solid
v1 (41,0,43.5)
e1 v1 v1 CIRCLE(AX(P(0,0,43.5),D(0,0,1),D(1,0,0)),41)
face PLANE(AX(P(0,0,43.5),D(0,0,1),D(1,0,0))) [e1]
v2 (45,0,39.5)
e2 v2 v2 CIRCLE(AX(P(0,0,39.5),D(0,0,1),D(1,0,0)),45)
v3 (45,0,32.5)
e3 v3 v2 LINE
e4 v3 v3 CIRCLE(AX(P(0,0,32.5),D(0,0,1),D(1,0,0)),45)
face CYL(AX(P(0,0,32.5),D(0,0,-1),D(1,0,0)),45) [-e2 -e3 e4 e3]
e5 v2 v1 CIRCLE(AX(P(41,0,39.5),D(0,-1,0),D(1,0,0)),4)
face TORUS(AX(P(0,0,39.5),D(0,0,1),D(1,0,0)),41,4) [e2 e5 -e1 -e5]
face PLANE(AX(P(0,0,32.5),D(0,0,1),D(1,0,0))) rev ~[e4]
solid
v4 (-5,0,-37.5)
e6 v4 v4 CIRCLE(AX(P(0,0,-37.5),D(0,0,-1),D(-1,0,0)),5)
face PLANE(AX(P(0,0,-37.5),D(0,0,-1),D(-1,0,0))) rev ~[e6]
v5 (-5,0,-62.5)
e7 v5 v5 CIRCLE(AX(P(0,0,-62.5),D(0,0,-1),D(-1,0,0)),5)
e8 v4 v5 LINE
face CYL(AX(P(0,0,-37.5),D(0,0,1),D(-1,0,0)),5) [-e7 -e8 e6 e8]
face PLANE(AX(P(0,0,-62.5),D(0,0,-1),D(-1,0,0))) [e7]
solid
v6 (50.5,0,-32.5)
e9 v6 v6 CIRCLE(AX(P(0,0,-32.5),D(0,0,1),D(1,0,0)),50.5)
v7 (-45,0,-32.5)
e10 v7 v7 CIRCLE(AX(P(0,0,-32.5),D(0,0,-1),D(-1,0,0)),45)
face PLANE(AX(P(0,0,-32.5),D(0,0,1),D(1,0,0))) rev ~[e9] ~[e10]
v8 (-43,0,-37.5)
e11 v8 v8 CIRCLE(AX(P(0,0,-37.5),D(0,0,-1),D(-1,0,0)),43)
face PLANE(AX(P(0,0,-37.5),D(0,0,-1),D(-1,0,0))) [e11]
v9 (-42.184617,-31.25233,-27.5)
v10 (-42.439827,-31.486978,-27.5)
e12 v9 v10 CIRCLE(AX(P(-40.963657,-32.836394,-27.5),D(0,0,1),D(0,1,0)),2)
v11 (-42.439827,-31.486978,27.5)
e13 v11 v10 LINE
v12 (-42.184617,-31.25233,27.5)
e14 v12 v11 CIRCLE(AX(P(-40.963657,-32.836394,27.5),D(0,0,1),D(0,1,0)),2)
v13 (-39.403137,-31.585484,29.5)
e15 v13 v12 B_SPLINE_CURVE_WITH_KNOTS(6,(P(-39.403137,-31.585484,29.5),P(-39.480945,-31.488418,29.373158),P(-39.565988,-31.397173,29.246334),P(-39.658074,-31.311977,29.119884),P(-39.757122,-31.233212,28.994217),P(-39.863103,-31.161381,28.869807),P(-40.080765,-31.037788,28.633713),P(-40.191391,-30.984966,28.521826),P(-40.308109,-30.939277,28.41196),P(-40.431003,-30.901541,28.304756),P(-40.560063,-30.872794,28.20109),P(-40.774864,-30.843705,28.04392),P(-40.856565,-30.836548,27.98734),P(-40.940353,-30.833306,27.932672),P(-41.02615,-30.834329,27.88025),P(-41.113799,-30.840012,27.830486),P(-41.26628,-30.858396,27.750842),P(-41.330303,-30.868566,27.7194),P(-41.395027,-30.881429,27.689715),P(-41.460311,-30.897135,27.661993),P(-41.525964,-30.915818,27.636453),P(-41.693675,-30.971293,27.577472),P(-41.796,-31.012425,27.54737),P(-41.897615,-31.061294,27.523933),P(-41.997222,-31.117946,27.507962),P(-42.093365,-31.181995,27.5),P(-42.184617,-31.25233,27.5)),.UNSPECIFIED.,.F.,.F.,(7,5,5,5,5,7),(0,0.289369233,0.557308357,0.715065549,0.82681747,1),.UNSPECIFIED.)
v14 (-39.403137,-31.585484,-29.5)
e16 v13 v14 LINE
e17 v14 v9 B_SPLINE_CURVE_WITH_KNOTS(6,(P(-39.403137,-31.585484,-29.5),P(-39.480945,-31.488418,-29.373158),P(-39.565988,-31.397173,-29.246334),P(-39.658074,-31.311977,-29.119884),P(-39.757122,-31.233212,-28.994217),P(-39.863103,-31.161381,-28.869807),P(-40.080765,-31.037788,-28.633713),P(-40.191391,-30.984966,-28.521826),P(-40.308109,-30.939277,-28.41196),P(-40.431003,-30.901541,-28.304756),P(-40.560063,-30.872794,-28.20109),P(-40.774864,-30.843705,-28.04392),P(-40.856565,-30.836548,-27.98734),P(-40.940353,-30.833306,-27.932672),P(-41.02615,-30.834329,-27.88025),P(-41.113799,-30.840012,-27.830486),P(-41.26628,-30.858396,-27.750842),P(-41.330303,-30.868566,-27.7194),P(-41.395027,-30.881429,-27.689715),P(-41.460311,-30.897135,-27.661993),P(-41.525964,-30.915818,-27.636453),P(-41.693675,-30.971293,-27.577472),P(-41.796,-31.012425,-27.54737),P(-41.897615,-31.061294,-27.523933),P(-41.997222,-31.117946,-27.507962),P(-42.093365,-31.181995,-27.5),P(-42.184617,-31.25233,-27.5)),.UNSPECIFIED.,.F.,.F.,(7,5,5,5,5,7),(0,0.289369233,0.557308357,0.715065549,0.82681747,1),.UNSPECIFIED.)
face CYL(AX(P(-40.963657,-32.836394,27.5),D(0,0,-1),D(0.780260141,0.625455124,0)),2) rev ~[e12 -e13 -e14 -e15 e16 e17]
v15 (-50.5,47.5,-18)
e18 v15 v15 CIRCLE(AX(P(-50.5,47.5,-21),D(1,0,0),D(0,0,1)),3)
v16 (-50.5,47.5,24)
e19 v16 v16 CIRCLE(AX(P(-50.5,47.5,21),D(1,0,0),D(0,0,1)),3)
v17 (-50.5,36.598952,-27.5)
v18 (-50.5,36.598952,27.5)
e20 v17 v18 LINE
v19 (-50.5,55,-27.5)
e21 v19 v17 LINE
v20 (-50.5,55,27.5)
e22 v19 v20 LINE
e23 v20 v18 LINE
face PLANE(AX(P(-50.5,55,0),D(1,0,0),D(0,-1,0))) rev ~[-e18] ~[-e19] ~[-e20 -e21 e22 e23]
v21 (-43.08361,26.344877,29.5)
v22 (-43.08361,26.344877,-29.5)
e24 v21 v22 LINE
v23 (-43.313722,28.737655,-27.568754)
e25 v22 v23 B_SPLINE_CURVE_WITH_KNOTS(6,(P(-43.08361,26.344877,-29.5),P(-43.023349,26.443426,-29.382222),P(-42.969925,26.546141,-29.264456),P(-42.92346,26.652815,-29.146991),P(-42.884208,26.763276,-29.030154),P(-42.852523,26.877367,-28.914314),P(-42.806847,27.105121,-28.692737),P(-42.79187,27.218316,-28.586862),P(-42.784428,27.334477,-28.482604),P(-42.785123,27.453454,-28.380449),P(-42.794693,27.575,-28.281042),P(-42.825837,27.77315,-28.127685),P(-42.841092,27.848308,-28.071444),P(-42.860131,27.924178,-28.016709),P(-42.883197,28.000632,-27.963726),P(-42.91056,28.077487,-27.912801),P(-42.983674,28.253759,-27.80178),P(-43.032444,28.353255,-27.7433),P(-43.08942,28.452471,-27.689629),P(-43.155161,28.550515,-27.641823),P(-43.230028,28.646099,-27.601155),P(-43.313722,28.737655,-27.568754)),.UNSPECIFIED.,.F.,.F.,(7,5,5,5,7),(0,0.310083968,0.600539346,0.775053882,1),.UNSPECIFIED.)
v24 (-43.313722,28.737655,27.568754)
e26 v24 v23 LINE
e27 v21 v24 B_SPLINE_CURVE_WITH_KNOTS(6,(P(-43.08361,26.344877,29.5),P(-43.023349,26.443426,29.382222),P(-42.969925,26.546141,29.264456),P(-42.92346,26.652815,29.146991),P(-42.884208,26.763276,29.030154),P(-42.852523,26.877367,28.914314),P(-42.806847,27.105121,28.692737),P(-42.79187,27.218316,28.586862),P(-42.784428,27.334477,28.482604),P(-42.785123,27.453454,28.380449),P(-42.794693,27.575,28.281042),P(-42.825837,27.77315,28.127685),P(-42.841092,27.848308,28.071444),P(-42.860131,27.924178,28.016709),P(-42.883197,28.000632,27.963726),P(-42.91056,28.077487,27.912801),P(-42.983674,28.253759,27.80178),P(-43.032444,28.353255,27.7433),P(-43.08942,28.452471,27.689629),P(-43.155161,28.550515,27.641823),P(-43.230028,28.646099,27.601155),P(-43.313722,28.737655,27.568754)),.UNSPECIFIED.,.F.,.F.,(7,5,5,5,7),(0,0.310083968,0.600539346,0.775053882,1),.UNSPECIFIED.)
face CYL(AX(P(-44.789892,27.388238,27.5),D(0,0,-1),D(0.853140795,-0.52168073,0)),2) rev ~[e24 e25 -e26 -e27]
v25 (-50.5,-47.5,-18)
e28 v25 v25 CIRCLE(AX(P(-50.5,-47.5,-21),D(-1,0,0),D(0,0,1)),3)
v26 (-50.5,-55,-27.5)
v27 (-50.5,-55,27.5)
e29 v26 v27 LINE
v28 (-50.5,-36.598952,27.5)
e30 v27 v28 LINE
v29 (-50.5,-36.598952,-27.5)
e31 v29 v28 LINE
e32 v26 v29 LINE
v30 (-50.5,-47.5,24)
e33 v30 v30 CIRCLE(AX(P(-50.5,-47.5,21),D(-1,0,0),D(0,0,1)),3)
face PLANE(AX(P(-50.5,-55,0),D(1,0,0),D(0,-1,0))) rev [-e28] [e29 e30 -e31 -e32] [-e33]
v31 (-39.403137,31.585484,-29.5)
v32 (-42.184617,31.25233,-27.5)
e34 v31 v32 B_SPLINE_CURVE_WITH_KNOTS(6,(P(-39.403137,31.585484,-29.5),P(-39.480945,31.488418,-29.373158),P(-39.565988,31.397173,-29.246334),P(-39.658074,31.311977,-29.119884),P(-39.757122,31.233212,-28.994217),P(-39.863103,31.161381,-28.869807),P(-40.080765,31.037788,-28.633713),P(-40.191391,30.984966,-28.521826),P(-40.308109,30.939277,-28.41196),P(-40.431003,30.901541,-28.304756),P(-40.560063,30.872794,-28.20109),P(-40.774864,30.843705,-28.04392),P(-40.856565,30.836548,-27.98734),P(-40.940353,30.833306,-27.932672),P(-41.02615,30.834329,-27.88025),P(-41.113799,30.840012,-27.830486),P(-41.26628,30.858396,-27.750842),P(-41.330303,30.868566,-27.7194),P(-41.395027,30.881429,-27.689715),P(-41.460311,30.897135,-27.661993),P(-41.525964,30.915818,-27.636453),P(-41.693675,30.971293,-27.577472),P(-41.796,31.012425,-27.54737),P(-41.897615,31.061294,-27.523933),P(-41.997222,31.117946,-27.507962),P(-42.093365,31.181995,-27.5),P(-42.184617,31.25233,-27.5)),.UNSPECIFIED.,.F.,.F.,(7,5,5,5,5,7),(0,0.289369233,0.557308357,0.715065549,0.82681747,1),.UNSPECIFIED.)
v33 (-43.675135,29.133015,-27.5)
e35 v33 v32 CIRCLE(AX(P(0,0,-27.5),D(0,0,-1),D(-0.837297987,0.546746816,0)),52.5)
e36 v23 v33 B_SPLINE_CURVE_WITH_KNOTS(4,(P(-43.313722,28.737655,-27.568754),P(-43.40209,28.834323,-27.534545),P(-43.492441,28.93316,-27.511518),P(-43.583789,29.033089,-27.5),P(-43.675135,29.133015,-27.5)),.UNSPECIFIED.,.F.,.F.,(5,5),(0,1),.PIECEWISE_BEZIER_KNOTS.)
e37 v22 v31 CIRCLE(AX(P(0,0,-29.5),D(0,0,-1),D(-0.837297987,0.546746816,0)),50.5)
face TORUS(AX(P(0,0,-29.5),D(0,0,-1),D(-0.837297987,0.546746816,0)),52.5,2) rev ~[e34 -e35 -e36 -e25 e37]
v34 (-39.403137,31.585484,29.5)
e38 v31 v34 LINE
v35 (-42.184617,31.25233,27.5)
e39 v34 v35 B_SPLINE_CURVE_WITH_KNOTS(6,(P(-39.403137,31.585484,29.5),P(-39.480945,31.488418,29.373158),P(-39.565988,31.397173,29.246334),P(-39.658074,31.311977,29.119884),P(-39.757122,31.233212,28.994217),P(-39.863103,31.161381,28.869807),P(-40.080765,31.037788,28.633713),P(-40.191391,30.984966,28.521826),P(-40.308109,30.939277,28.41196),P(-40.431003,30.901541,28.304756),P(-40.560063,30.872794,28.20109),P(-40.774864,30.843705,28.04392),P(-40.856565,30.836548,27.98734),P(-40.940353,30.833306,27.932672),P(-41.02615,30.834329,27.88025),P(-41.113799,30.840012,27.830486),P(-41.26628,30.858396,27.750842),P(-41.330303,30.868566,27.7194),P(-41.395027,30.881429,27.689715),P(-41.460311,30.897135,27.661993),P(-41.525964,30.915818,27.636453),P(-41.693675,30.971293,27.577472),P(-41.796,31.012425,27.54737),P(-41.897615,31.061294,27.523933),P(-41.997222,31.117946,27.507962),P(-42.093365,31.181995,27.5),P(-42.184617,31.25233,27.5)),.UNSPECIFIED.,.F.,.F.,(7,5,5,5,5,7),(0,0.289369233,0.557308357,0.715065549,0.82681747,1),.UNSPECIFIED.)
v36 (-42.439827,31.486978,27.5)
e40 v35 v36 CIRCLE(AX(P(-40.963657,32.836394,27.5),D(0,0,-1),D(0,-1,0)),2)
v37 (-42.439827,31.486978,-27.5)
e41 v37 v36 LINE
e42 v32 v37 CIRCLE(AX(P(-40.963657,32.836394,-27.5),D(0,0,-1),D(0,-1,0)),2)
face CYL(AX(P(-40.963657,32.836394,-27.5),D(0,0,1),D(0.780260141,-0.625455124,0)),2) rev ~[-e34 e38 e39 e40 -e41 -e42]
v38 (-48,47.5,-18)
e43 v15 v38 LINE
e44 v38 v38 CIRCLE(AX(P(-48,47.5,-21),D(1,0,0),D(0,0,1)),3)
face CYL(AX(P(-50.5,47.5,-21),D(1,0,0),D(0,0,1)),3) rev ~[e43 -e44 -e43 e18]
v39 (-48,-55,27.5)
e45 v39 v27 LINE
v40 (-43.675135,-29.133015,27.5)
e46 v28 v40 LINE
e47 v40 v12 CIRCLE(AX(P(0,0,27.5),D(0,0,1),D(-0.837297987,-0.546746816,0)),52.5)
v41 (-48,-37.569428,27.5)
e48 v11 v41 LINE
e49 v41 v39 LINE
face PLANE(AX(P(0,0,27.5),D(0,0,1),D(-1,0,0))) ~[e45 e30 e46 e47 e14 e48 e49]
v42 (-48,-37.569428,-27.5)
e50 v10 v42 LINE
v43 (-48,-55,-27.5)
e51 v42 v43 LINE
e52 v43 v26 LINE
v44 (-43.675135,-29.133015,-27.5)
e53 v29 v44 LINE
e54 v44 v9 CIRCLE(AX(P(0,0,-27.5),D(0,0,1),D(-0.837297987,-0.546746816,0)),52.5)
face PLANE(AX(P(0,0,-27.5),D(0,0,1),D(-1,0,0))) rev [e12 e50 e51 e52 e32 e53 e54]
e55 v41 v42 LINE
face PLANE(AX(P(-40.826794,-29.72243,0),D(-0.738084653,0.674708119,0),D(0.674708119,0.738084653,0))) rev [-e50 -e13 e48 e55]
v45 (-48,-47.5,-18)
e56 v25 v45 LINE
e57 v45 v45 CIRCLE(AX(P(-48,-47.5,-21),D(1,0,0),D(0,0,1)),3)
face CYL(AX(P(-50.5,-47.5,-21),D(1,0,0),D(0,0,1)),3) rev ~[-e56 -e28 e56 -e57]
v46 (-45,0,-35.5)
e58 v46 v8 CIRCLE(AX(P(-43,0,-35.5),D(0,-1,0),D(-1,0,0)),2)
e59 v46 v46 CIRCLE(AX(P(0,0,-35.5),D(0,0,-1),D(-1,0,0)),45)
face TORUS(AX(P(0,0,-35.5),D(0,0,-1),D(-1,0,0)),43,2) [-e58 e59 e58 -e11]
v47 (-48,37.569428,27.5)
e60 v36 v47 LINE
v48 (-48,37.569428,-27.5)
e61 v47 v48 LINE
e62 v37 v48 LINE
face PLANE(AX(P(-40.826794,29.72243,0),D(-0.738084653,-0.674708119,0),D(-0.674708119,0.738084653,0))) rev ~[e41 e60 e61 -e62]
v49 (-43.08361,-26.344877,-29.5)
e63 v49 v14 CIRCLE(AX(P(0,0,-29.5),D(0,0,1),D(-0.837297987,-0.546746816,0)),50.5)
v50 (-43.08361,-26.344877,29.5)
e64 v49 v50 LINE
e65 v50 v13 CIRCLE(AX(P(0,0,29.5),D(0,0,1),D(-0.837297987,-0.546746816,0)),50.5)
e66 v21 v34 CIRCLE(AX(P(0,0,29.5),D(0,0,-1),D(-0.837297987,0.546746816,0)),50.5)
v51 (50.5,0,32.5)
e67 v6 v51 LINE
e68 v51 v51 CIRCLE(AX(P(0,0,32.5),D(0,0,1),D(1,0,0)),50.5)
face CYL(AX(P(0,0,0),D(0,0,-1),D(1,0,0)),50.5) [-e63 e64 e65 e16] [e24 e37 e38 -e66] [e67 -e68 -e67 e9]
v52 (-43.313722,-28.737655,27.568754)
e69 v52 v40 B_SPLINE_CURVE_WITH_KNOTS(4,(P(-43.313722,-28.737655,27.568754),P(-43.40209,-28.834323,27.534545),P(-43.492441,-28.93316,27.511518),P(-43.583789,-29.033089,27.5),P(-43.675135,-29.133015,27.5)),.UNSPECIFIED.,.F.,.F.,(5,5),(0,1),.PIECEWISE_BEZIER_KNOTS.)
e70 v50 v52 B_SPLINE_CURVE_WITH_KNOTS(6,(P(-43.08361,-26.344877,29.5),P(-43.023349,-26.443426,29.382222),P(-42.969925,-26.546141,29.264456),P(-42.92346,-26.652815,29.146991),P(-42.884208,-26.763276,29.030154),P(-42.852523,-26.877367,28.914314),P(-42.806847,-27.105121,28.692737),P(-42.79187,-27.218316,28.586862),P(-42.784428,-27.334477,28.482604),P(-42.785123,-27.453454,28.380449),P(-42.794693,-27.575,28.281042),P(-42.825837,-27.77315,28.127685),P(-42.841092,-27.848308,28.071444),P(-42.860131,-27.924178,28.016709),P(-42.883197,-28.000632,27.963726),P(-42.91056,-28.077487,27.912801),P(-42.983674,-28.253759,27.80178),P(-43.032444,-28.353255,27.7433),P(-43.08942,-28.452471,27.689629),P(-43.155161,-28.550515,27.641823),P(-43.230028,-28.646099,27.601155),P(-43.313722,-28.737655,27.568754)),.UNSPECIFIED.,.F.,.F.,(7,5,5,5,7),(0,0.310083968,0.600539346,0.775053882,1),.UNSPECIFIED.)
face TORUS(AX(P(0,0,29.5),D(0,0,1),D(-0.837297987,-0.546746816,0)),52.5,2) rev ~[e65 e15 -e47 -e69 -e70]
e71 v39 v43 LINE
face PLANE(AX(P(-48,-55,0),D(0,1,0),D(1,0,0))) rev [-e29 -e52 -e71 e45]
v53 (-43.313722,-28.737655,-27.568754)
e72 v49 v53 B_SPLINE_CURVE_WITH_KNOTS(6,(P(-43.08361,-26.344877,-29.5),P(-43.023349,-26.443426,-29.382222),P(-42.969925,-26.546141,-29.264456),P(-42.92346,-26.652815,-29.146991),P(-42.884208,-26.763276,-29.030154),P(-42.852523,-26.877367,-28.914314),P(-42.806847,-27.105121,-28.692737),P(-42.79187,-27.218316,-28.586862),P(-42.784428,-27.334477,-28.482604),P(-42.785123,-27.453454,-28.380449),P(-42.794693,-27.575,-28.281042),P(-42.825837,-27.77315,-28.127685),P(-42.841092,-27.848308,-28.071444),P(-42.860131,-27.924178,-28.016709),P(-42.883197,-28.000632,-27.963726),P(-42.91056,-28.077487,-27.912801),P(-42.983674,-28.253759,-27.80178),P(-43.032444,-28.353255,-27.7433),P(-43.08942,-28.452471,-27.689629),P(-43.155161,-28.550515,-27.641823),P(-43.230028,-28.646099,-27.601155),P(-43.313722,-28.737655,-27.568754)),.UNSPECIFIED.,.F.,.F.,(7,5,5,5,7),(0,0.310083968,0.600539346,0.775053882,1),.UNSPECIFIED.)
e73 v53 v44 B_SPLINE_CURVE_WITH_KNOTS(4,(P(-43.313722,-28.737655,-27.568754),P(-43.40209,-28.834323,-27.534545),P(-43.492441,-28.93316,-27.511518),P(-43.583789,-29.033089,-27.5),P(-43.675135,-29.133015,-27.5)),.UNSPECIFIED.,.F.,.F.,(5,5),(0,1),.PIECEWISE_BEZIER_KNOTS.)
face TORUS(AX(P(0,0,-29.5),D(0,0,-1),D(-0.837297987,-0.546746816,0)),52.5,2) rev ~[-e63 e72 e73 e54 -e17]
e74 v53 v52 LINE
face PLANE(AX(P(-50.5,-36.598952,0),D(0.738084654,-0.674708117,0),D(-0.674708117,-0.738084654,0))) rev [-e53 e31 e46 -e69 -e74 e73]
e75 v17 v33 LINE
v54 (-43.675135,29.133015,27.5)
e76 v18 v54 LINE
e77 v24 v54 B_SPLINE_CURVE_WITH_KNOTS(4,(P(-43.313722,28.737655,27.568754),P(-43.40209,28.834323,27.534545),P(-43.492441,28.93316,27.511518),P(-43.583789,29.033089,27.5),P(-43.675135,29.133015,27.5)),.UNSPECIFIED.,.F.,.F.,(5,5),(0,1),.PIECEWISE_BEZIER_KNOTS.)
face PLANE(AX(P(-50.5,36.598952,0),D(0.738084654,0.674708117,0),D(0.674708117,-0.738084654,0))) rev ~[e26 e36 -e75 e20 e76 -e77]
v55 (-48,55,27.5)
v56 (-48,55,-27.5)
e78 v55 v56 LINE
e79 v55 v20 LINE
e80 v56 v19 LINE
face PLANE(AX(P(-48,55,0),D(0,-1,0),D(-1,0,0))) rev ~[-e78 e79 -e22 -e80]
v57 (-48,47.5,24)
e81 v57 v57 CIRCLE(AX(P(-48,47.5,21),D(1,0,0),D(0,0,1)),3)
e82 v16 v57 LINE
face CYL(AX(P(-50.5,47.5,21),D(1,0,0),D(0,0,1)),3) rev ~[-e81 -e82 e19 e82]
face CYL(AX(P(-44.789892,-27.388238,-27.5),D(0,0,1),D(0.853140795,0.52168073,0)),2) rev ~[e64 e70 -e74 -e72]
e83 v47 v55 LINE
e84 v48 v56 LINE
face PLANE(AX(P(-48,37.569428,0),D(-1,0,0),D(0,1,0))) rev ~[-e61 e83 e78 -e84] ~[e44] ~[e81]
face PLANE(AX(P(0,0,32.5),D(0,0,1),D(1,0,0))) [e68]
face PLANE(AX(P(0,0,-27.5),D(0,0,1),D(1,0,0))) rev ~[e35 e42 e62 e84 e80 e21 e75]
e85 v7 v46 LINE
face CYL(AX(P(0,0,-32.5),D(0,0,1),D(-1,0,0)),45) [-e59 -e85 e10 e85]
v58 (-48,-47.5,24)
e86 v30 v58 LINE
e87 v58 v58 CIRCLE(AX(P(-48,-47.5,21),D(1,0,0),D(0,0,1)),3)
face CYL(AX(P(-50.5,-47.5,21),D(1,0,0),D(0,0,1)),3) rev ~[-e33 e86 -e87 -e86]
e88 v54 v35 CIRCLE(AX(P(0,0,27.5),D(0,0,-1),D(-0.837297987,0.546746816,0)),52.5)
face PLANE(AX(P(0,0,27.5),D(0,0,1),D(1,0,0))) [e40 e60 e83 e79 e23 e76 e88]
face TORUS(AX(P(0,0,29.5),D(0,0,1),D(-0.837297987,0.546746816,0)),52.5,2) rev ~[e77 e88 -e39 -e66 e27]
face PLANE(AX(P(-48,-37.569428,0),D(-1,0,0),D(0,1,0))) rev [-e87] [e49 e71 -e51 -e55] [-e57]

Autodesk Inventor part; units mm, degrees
ref_plane "YZ Plane" through (0, 0, 0) normal (1, 0, 0) x (0, 1, 0)
ref_plane "XZ Plane" through (0, 0, 0) normal (0, 1, 0) x (-1, 0, 0)
ref_plane "XY Plane" through (0, 0, 0) normal (0, 0, 1) x (1, 0, 0)
sketch "Sketch1" plane through (0, 0, 0) normal (0, 0, 1) x (1, 0, 0)
  circle A0 centre (0, 0) radius 50.5
  dimension "d0" = 101
sketch "Sketch1 outline for Extrusion1" plane through (0, 0, 0) normal (0, 0, 1) x (1, 0, 0)
  circle A0 centre (0, 0) radius 50.5
extrude "Extrusion1" add sketch "Sketch1 outline for Extrusion1" along normal mid plane 65
sketch "Sketch2" plane through (0, 0, 32.5) normal (0, 0, 1) x (1, 0, 0)
  circle A0 centre (0, 0) radius 45
  dimension "d3" = 90
sketch "Sketch2 outline for Extrusion2" plane through (0, 0, 32.5) normal (0, 0, 1) x (1, 0, 0)
  circle A0 centre (0, 0) radius 45
extrude "Extrusion2" add sketch "Sketch2 outline for Extrusion2" along normal blind 11 separate body
sketch "Sketch3" plane through (0, 0, -32.5) normal (0, 0, -1) x (-1, 0, 0)
  circle A0 centre (0, 0) radius 45
  dimension "d6" = 90
sketch "Sketch3 outline for Extrusion3" plane through (0, 0, -32.5) normal (0, 0, -1) x (-1, 0, 0)
  circle A0 centre (0, 0) radius 45
extrude "Extrusion3" add sketch "Sketch3 outline for Extrusion3" along normal blind 5 bodies 1
sketch "Sketch4" plane through (0, 0, 0) normal (0, 0, 1) x (1, 0, 0)
  line L0 (-50.5, 36.598952) -> (-50.5, 55)
  line L1 (-50.5, 55) -> (-48, 55)
  line L2 (-48, 55) -> (-48, 37.569428)
  line L3 (-48, 37.569428) -> (-40.826794, 29.72243)
  circle A0 centre (0, 0) radius 50.5
  line L4 (-50.5, 36.598952) -> (-42.283548, 27.610714)
  dimension "d9" = 55
  dimension "d10" = 2.5
  dimension "d11" = 2.5
  dimension "d12" = 18.40105
  dimension "d13" = 17.43057
sketch "Sketch4 outline for Extrusion4" plane through (0, 0, 0) normal (0, 0, 1) x (1, 0, 0)
  line L0 (-50.5, 55) -> (-50.5, 36.598952)
  line L1 (-48, 55) -> (-50.5, 55)
  line L2 (-48, 37.569428) -> (-48, 55)
  line L3 (-40.826794, 29.72243) -> (-48, 37.569428)
  arc A0 (-42.283548, 27.610714) -> (-40.826794, 29.72243) centre (0, 0) cw
  line L4 (-50.5, 36.598952) -> (-42.283548, 27.610714)
extrude "Extrusion4" add sketch "Sketch4 outline for Extrusion4" along normal mid plane 55 bodies 1
mirror "Mirror1" about plane through (0, 0, 0) normal (0, 1, 0) of "Extrusion4" bodies 1
sketch "Sketch5" plane through (-50.5, 36.598952, 27.5) normal (-1, 0, 0) x (0, 0, 1)
  line L0 (-27.5, 52.121928) -> (-27.5, -131.017503) construction
  point P0 (-27.5, -36.598952)
  point P1 (-6.5, 10.901048)
  point P2 (-48.5, 10.901048)
  dimension "d16" = 42
  dimension "d17" = 47.5
hole "Hole1" at (-50.5, 47.5, 21) at (-50.5, 47.5, -21) direction (1, 0, 0) diameter 6 depth 4.825 bodies 1
mirror "Mirror2" about plane through (0, 0, 0) normal (0, 1, 0) of "Hole1" bodies 1
sketch "Sketch6" plane through (0, 0, -37.5) normal (0, 0, -1) x (-1, 0, 0)
  point P0 (0, 0)
sketch "Sketch7" plane through (0, 0, -37.5) normal (0, 0, -1) x (-1, 0, 0)
  circle A0 centre (0, 0) radius 5
  dimension "d25" = 10
sketch "Sketch7 outline for Extrusion5" plane through (0, 0, -37.5) normal (0, 0, -1) x (-1, 0, 0)
  circle A0 centre (0, 0) radius 5
extrude "Extrusion5" add sketch "Sketch7 outline for Extrusion5" along normal blind 25 separate body
fillet "Fillet1" radius 4 1 edges at (-45, 0, 43.5)
fillet "Fillet3" radius 2 8 edges at (-42.2835, 27.6107, 0) (-40.8268, -29.7224, 0) (-42.2835, -27.6107, 0) (-40.8268, 29.7224, 0) (-41.5686, 28.6758, 27.5) (-41.5686, -28.6758, 27.5) (-41.5686, 28.6758, -27.5) (-41.5686, -28.6758, -27.5)
fillet "Fillet4" radius 2 1 edges at (45, 0, -37.5)
properties part number "motor"
